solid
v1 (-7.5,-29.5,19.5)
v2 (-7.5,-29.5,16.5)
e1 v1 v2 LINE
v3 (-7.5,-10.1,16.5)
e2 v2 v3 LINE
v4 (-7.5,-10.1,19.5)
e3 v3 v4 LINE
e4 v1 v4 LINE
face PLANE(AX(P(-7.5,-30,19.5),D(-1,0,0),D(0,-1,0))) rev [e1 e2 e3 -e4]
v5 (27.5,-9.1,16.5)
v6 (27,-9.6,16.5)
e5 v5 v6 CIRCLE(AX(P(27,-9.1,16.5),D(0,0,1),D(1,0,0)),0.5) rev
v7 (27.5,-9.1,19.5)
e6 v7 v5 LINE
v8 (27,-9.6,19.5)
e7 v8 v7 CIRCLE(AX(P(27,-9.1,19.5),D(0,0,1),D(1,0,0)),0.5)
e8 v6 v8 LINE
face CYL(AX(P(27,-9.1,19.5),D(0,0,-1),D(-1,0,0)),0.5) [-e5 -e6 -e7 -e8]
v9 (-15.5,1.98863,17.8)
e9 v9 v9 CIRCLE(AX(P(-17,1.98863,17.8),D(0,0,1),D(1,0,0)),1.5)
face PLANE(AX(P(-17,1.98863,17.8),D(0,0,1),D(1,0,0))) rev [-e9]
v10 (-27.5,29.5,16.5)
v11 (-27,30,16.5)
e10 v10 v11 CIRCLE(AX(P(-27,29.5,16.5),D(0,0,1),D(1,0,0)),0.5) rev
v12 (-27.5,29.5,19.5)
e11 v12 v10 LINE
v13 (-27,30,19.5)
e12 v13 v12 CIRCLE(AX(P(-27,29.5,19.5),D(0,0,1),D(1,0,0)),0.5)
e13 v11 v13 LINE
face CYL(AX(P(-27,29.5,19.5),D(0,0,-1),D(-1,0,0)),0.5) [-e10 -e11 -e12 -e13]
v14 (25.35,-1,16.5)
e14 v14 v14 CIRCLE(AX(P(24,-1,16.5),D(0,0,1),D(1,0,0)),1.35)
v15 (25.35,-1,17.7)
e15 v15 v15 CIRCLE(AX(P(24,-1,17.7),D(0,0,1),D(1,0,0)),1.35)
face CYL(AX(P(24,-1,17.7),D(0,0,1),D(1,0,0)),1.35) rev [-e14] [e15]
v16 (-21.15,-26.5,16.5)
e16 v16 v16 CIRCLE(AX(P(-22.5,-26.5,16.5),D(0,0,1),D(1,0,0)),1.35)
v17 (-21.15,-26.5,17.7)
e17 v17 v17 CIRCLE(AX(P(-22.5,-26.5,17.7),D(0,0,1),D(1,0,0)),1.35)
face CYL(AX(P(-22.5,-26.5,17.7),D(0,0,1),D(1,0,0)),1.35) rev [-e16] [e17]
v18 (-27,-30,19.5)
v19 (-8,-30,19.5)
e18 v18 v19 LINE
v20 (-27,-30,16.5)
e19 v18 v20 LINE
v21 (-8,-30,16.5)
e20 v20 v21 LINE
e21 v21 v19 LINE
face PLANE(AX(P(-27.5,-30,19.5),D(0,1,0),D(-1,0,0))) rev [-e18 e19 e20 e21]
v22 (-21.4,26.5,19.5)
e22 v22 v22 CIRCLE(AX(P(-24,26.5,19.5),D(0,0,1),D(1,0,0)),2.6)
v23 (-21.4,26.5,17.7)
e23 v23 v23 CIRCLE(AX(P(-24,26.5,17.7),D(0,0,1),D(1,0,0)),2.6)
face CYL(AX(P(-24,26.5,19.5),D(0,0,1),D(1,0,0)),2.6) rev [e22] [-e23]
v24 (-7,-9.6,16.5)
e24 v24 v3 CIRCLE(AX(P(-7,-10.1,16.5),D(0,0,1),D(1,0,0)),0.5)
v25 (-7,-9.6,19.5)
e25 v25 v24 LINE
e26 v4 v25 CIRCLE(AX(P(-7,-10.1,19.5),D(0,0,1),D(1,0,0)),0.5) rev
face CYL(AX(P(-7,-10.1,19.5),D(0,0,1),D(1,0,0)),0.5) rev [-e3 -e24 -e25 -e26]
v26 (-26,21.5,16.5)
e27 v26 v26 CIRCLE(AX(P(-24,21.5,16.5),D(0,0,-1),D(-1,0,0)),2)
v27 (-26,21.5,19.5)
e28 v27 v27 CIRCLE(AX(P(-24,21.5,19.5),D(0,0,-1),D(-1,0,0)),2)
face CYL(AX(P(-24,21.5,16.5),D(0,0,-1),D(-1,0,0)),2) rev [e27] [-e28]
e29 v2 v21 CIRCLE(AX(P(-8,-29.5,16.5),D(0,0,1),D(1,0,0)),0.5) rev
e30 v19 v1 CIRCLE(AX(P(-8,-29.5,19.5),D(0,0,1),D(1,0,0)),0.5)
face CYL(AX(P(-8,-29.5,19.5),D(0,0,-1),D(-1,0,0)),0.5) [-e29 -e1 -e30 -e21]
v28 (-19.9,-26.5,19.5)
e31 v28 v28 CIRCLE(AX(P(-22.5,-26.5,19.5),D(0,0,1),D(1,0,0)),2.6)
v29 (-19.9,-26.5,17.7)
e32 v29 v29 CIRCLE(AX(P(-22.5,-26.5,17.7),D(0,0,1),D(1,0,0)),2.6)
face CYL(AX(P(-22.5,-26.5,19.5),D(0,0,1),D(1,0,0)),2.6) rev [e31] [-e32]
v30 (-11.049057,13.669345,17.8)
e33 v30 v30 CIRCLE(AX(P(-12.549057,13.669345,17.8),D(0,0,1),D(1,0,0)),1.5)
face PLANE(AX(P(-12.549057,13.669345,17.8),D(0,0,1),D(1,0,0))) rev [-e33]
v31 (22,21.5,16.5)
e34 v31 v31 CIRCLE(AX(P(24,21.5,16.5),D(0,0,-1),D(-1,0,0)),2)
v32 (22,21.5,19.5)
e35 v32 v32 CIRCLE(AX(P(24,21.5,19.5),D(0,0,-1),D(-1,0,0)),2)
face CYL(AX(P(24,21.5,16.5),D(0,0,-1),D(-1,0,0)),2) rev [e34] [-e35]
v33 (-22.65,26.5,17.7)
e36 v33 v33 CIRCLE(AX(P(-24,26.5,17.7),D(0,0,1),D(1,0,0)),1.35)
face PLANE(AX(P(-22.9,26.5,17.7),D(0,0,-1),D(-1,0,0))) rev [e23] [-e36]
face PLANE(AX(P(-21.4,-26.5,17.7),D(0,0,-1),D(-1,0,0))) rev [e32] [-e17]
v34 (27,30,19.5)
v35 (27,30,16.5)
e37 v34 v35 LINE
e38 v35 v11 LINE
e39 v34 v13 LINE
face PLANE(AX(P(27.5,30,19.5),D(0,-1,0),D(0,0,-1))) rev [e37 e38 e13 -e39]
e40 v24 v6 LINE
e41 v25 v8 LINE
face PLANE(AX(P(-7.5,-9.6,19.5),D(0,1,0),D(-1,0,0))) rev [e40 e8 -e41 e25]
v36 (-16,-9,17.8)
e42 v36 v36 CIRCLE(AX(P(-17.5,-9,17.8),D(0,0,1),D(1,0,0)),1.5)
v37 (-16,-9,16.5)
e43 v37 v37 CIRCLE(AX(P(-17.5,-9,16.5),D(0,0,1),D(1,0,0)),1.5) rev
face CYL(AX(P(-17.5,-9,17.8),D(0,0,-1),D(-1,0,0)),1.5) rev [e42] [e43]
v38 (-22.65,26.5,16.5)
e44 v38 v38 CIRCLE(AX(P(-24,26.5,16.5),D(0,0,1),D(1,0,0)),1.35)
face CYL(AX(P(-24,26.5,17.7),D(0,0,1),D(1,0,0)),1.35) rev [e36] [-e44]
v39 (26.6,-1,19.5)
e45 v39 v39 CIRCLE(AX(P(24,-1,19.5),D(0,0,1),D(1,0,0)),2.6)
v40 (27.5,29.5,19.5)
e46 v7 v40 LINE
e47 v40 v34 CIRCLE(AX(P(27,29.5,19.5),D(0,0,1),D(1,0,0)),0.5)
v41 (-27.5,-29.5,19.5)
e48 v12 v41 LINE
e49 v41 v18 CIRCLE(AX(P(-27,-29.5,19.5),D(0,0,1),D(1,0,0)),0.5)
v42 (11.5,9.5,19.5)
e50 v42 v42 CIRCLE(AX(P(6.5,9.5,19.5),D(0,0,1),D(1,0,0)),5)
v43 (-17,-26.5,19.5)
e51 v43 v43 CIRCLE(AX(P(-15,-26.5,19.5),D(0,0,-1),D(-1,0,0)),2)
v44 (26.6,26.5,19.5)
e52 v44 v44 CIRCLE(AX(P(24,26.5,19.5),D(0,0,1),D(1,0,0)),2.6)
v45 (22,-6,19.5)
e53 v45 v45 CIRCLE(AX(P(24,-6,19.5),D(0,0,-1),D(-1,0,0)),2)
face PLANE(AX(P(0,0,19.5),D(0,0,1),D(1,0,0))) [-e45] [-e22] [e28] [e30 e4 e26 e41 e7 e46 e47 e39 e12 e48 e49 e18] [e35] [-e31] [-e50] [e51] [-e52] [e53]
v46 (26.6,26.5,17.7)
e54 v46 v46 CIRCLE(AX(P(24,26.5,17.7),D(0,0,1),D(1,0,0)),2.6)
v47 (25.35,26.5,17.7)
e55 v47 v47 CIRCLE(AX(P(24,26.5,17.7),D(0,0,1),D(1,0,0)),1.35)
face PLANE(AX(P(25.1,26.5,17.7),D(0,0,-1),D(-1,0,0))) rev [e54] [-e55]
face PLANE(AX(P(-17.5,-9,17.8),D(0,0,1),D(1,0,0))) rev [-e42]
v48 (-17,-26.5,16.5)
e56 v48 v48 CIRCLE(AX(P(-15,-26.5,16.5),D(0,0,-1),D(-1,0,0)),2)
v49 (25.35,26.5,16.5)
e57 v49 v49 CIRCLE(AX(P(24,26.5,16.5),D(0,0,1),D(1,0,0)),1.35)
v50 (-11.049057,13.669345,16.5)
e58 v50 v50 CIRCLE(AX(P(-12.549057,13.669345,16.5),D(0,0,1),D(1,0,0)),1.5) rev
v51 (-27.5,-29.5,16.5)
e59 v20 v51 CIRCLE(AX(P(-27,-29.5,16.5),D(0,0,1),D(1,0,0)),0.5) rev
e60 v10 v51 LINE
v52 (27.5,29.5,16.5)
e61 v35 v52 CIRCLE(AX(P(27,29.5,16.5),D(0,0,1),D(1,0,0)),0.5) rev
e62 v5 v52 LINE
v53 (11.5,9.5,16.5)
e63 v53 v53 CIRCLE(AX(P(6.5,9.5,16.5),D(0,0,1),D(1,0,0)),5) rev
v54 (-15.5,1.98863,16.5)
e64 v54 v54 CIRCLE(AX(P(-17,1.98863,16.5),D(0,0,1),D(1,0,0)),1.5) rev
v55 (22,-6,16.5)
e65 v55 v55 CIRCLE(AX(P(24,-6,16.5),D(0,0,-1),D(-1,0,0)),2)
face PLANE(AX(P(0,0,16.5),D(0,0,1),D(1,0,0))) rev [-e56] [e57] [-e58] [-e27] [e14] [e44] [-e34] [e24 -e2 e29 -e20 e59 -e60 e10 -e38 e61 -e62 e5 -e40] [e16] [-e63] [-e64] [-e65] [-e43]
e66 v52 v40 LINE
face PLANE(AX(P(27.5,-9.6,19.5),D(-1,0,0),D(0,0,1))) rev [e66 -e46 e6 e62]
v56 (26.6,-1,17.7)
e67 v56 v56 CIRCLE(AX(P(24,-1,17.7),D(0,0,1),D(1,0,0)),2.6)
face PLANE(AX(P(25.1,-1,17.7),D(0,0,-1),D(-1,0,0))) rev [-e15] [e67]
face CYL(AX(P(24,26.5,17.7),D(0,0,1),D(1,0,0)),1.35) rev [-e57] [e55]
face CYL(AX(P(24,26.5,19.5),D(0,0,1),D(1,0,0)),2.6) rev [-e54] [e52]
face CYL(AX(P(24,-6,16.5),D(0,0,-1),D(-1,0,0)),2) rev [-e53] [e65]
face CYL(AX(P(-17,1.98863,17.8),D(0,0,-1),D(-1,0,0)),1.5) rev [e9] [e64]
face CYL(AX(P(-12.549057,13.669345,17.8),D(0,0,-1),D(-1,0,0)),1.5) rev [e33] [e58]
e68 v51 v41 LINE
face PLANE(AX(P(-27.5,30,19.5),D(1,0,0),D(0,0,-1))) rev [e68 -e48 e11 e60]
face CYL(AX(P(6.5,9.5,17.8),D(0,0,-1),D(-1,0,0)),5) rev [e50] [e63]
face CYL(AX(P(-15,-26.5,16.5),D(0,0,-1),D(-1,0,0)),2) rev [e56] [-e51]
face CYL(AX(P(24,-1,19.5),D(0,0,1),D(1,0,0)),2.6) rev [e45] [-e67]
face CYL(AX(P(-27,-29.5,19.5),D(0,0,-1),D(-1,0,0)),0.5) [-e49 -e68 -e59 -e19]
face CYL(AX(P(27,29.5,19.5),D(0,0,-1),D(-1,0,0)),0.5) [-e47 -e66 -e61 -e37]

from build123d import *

# Parameters (mm, degrees)
SKETCH_1_W                     = 55
SKETCH_1_H                     = 60
EXTRUDE_1_DEPTH                = 16.5
HOLE_WIZARD_3_6_3_6_1_D        = 3.6
HOLE_WIZARD_3_6_3_6_1_DEPTH    = 25
HOLE_WIZARD_3_6_3_6_1_TIP      = 1.081549114
HOLE_WIZARD_M2_5_1_D           = 2.05
HOLE_WIZARD_M2_5_1_DEPTH       = 14
HOLE_WIZARD_M2_5_1_TIP         = 0.615882135
SKETCH_8_W                     = 35
SKETCH_8_H                     = 20.4
CUT_EXTRUDE_1_DEPTH            = 44.914690025
CUT_EXTRUDE_START              = 2.5
SKETCH_9_W                     = 20
SKETCH_9_H                     = 6
CUT_EXTRUDE_2_DEPTH            = 42.414690025
SHELL_START                    = 1.8
SHELL_1_DEPTH                  = 14.7
EXTRUDE_2_DEPTH                = 3
HOLE_WIZARD_1_AT_2_COUNT       = 2
HOLE_WIZARD_1_AT_2_PITCH       = 48
HOLE_WIZARD_1_AT_3_COUNT       = 2
HOLE_WIZARD_1_AT_3_PITCH       = 27.5
HOLE_WIZARD_1_AT_4_COUNT       = 2
HOLE_WIZARD_1_AT_4_PITCH       = 70.507091842
CUT_EXTRUDE_START_2            = -1.5
SKETCH_15_R                    = 5
SKETCH_15_R_2                  = 1.5
CUT_EXTRUDE_3_DEPTH            = 17.5
SKETCH_16_R                    = 3
CUT_EXTRUDE_4_DEPTH            = 12
CUT_EXTRUDE_5_DEPTH            = 45.379499772
CUT_EXTRUDE_5_DEPTH_BACK       = 45.379499772
SKETCH_17_R                    = 5
FILLET_1_R                     = 0.5
FILLET_2_R                     = 0.5
SKETCH_20_W                    = 2
SKETCH_20_H                    = 3
HOLE_WIZARD_4_0_4_1_AT_2_COUNT = 2
HOLE_WIZARD_4_0_4_1_AT_2_PITCH = 27.5
HOLE_WIZARD_4_0_4_1_AT_3_COUNT = 2
HOLE_WIZARD_4_0_4_1_AT_3_PITCH = 61.846584384
HOLE_WIZARD_4_0_4_1_AT_4_COUNT = 2
HOLE_WIZARD_4_0_4_1_AT_4_PITCH = 48
HOLE_WIZARD_2_7_2_7_1_D        = 2.7


# Read off the part's stored shape, not the designer's step: 抽壳1
with BuildPart() as part:
    # 草图1 → 凸台-拉伸1 (new body)
    with BuildSketch(Plane.XY):
        Rectangle(SKETCH_1_W, SKETCH_1_H)
    extrude(amount=EXTRUDE_1_DEPTH)

    # Ø3.6 (3.6) 直径孔1
    with Locations(Plane.XY.offset(16.5)):
        with Locations((-24, 21.5), (24, 21.5), (24, -6), (-15, -26.5)):
            Hole(HOLE_WIZARD_3_6_3_6_1_D / 2, depth=HOLE_WIZARD_3_6_3_6_1_DEPTH)
            with Locations((0, 0, -(HOLE_WIZARD_3_6_3_6_1_DEPTH + HOLE_WIZARD_3_6_3_6_1_TIP / 2))):  # 118° drill point
                Cone(0, HOLE_WIZARD_3_6_3_6_1_D / 2, HOLE_WIZARD_3_6_3_6_1_TIP, mode=Mode.SUBTRACT)

    # M2.5 螺纹孔1
    with Locations(Plane.XY.offset(16.5)):
        with Locations((-24, 26.5), (24, 26.5), (24, -1), (-22.5, -26.5)):
            Hole(HOLE_WIZARD_M2_5_1_D / 2, depth=HOLE_WIZARD_M2_5_1_DEPTH)
            with Locations((0, 0, -(HOLE_WIZARD_M2_5_1_DEPTH + HOLE_WIZARD_M2_5_1_TIP / 2))):  # 118° drill point
                Cone(0, HOLE_WIZARD_M2_5_1_D / 2, HOLE_WIZARD_M2_5_1_TIP, mode=Mode.SUBTRACT)

    # 草图8 → 切除-拉伸1 (cut, through all)
    with BuildSketch(Plane.XY.offset(16.5)):
        with Locations((10, -19.8)):
            Rectangle(SKETCH_8_W, SKETCH_8_H)
    extrude(amount=-CUT_EXTRUDE_1_DEPTH, mode=Mode.SUBTRACT)

    # 草图9 → 切除-拉伸2 (cut, through all)
    with BuildSketch(Plane(origin=(0, 0, 16.5), x_dir=(-1, 0, 0), z_dir=(0, 0, -1)).offset(CUT_EXTRUDE_START)):
        with Locations((17.5, -27)):
            Rectangle(SKETCH_9_W, SKETCH_9_H)
    extrude(amount=CUT_EXTRUDE_2_DEPTH, mode=Mode.SUBTRACT)

    # 抽壳1 outline → 抽壳1 (cut)
    with BuildSketch(Plane.XY.offset(SHELL_START)):
        with BuildLine():
            ThreePointArc((-21.743758657, 28.2), (-21.182110509, 26.299690696), (-22.006919283, 24.4979375))
            ThreePointArc((-22.006919283, 24.4979375), (-20.910890356, 19.651378458), (-25.7, 18.326673669))
            Line((-25.7, 18.326673669), (-25.7, -22.2))
            Line((-25.7, -22.2), (-9.3, -22.2))
            Line((-9.3, -22.2), (-9.3, -7.8))
            Line((-9.3, -7.8), (20.882308546, -7.8))
            ThreePointArc((20.882308546, -7.8), (20.494996561, -5.178446051), (22.006919283, -3.0020625))
            ThreePointArc((22.006919283, -3.0020625), (21.865811165, 0.8509087), (25.7, 1.256241343))
            Line((25.7, 1.256241343), (25.7, 18.326673669))
            ThreePointArc((25.7, 18.326673669), (20.910890356, 19.651378458), (22.006919283, 24.4979375))
            ThreePointArc((22.006919283, 24.4979375), (21.182110509, 26.299690696), (21.743758657, 28.2))
            Line((21.743758657, 28.2), (-21.743758657, 28.2))
        make_face()
    extrude(amount=SHELL_1_DEPTH, mode=Mode.SUBTRACT)


with BuildPart() as body_2:
    # 草图10 → 凸台-拉伸2 (new body)
    with BuildSketch(Plane.XY.offset(16.5)):
        Polygon((-27.5, -30), (-7.5, -30), (-7.5, -9.6), (27.5, -9.6), (27.5, 30), (-27.5, 30), align=None)
    extrude(amount=EXTRUDE_2_DEPTH)


with BuildPart() as hole_wizard_1_tool:
    # 草图13 → 打孔尺寸(%根据)内六角圆柱头螺钉的类型1 (revolve)
    with BuildSketch(Plane(origin=(24, 26.5, 19.5), x_dir=(0, -1, 0), z_dir=(1, 0, 0))):
        Polygon((0, 0), (0, 19.5), (1.1, 19.5), (1.1, 1.8), (2.6, 1.8), (2.6, 0), align=None)
    hole_wizard_1 = revolve(axis=Axis((24, 26.5, 25.85), (0, 0, -1)))


with BuildPart() as part_1:
    add(part.part)

    # 打孔尺寸(%根据)内六角圆柱头螺钉的类型1: cut by hole_wizard_1_tool
    add(hole_wizard_1_tool.part, mode=Mode.SUBTRACT)


with BuildPart() as body_2_1:
    add(body_2.part)

    # 打孔尺寸(%根据)内六角圆柱头螺钉的类型1: cut by hole_wizard_1_tool
    add(hole_wizard_1_tool.part, mode=Mode.SUBTRACT)


with BuildPart() as hole_wizard_1_at_2_tool:
    # 打孔尺寸(%根据)内六角圆柱头螺钉的类型1 at 2: 打孔尺寸(%根据)内六角圆柱头螺钉的类型1 ×2
    with Locations(*[(-i * HOLE_WIZARD_1_AT_2_PITCH, 0, 0) for i in range(1, HOLE_WIZARD_1_AT_2_COUNT)]):
        add(hole_wizard_1)


with BuildPart() as part_2:
    add(part_1.part)

    # 打孔尺寸(%根据)内六角圆柱头螺钉的类型1 at 2: cut by hole_wizard_1_at_2_tool
    add(hole_wizard_1_at_2_tool.part, mode=Mode.SUBTRACT)


with BuildPart() as body_2_2:
    add(body_2_1.part)

    # 打孔尺寸(%根据)内六角圆柱头螺钉的类型1 at 2: cut by hole_wizard_1_at_2_tool
    add(hole_wizard_1_at_2_tool.part, mode=Mode.SUBTRACT)


with BuildPart() as hole_wizard_1_at_3_tool:
    # 打孔尺寸(%根据)内六角圆柱头螺钉的类型1 at 3: 打孔尺寸(%根据)内六角圆柱头螺钉的类型1 ×2
    with Locations(*[(0, -i * HOLE_WIZARD_1_AT_3_PITCH, 0) for i in range(1, HOLE_WIZARD_1_AT_3_COUNT)]):
        add(hole_wizard_1)


with BuildPart() as part_3:
    add(part_2.part)

    # 打孔尺寸(%根据)内六角圆柱头螺钉的类型1 at 3: cut by hole_wizard_1_at_3_tool
    add(hole_wizard_1_at_3_tool.part, mode=Mode.SUBTRACT)


with BuildPart() as body_2_3:
    add(body_2_2.part)

    # 打孔尺寸(%根据)内六角圆柱头螺钉的类型1 at 3: cut by hole_wizard_1_at_3_tool
    add(hole_wizard_1_at_3_tool.part, mode=Mode.SUBTRACT)


with BuildPart() as hole_wizard_1_at_4_tool:
    # 打孔尺寸(%根据)内六角圆柱头螺钉的类型1 at 4: 打孔尺寸(%根据)内六角圆柱头螺钉的类型1 ×2
    with Locations(*[Vector(-0.6595081258531857, -0.7516974337681476, 0) * (i * HOLE_WIZARD_1_AT_4_PITCH) for i in range(1, HOLE_WIZARD_1_AT_4_COUNT)]):
        add(hole_wizard_1)


with BuildPart() as part_4:
    add(part_3.part)

    # 打孔尺寸(%根据)内六角圆柱头螺钉的类型1 at 4: cut by hole_wizard_1_at_4_tool
    add(hole_wizard_1_at_4_tool.part, mode=Mode.SUBTRACT)


with BuildPart() as body_2_4:
    add(body_2_3.part)

    # 打孔尺寸(%根据)内六角圆柱头螺钉的类型1 at 4: cut by hole_wizard_1_at_4_tool
    add(hole_wizard_1_at_4_tool.part, mode=Mode.SUBTRACT)


with BuildPart() as cut_extrude_3_tool:
    # 草图15 → 切除-拉伸3 (new body)
    with BuildSketch(Plane.XY.offset(1.8).offset(CUT_EXTRUDE_START_2)):
        with Locations((6.5, 9.5)):
            Circle(SKETCH_15_R)
        with Locations((-12.549056621, 13.669345493)):
            Circle(SKETCH_15_R_2)
        with Locations((-17, 1.988630488)):
            Circle(SKETCH_15_R_2)
        with Locations((-17.5, -9)):
            Circle(SKETCH_15_R_2)
    extrude(amount=CUT_EXTRUDE_3_DEPTH)


with BuildPart() as part_5:
    add(part_4.part)

    # 切除-拉伸3: cut by cut_extrude_3_tool
    add(cut_extrude_3_tool.part, mode=Mode.SUBTRACT)

    # 草图16 → 切除-拉伸4 (cut)
    with BuildSketch(Plane(origin=(-7.5, 0, 0), x_dir=(0, 0, -1), z_dir=(1, 0, 0))):
        with Locations(Location((-8, -18, 0), (0, 0, 90))):
            Circle(SKETCH_16_R)
    extrude(amount=-CUT_EXTRUDE_4_DEPTH, mode=Mode.SUBTRACT)


with BuildPart() as body_2_5:
    add(body_2_4.part)

    # 切除-拉伸3: cut by cut_extrude_3_tool
    add(cut_extrude_3_tool.part, mode=Mode.SUBTRACT)


with BuildPart() as cut_extrude_5_tool:
    # 草图17 → 切除-拉伸5 (new, two sides: drawn at the far end of the back side and taken through both)
    with BuildSketch(Plane.XY.offset(1.8).offset(-CUT_EXTRUDE_5_DEPTH_BACK)):
        with Locations((6.5, 9.5)):
            Circle(SKETCH_17_R)
    extrude(amount=CUT_EXTRUDE_5_DEPTH + CUT_EXTRUDE_5_DEPTH_BACK)


with BuildPart() as part_6:
    add(part_5.part)

    # 切除-拉伸5: cut by cut_extrude_5_tool
    add(cut_extrude_5_tool.part, mode=Mode.SUBTRACT)

    # 圆角1
    fillet_1_edges = [part_6.edges().sort_by_distance(p)[0] for p in [
        (-27.5, 3, 0),
        (0, 30, 0),
        (27.5, 10.2, 0),
        (27.5, -9.6, 8.25),
        (-7.5, -16.8, 0),
        (10, -9.6, 0),
        (-7.5, -9.6, 8.25),
        (-7.5, -30, 15.25),
        (-27.5, -30, 15.25),
        (-27.5, 30, 8.25),
        (27.5, 30, 8.25),
        (-17.5, -24, 0),
        (-7.5, -24, 7),
        (-27.5, -24, 7),
    ]]
    fillet(fillet_1_edges, radius=FILLET_1_R)


with BuildPart() as body_2_6:
    add(body_2_5.part)

    # 切除-拉伸5: cut by cut_extrude_5_tool
    add(cut_extrude_5_tool.part, mode=Mode.SUBTRACT)

    # 圆角2
    fillet_2_edges = [body_2_6.edges().sort_by_distance(p)[0] for p in [
        (-27.5, 30, 18),
        (27.5, 30, 18),
        (27.5, -9.6, 18),
        (-7.5, -9.6, 18),
        (-7.5, -30, 18),
        (-27.5, -30, 18),
    ]]
    fillet(fillet_2_edges, radius=FILLET_2_R)

    # 草图20 → Ø4.0 (4) 直径孔1 (revolve, cut)
    with BuildSketch(Plane(origin=(24, 21.5, 16.5), x_dir=(0, 1, 0), z_dir=(1, 0, 0))):
        with Locations((1, 1.5)):
            Rectangle(SKETCH_20_W, SKETCH_20_H)
    hole_wizard_4_0_4_1 = revolve(axis=Axis((24, 21.5, 10.15), (0, 0, 1)), mode=Mode.SUBTRACT)

    # Ø4.0 (4) 直径孔1 at 2: Ø4.0 (4) 直径孔1 ×2
    with Locations(*[(0, -i * HOLE_WIZARD_4_0_4_1_AT_2_PITCH, 0) for i in range(1, HOLE_WIZARD_4_0_4_1_AT_2_COUNT)]):
        add(hole_wizard_4_0_4_1, mode=Mode.SUBTRACT)

    # Ø4.0 (4) 直径孔1 at 3: Ø4.0 (4) 直径孔1 ×2
    with Locations(*[Vector(-0.6305926250944656, -0.7761140001162656, 0) * (i * HOLE_WIZARD_4_0_4_1_AT_3_PITCH) for i in range(1, HOLE_WIZARD_4_0_4_1_AT_3_COUNT)]):
        add(hole_wizard_4_0_4_1, mode=Mode.SUBTRACT)

    # Ø4.0 (4) 直径孔1 at 4: Ø4.0 (4) 直径孔1 ×2
    with Locations(*[(-i * HOLE_WIZARD_4_0_4_1_AT_4_PITCH, 0, 0) for i in range(1, HOLE_WIZARD_4_0_4_1_AT_4_COUNT)]):
        add(hole_wizard_4_0_4_1, mode=Mode.SUBTRACT)

    # Ø2.7 (2.7) 直径孔1 (through all)
    with Locations(Plane.XY.offset(17.7)):
        with Locations((24, 26.5), (24, -1), (-24, 26.5), (-22.5, -26.5)):
            Hole(HOLE_WIZARD_2_7_2_7_1_D / 2)


solid = body_2_6.part
